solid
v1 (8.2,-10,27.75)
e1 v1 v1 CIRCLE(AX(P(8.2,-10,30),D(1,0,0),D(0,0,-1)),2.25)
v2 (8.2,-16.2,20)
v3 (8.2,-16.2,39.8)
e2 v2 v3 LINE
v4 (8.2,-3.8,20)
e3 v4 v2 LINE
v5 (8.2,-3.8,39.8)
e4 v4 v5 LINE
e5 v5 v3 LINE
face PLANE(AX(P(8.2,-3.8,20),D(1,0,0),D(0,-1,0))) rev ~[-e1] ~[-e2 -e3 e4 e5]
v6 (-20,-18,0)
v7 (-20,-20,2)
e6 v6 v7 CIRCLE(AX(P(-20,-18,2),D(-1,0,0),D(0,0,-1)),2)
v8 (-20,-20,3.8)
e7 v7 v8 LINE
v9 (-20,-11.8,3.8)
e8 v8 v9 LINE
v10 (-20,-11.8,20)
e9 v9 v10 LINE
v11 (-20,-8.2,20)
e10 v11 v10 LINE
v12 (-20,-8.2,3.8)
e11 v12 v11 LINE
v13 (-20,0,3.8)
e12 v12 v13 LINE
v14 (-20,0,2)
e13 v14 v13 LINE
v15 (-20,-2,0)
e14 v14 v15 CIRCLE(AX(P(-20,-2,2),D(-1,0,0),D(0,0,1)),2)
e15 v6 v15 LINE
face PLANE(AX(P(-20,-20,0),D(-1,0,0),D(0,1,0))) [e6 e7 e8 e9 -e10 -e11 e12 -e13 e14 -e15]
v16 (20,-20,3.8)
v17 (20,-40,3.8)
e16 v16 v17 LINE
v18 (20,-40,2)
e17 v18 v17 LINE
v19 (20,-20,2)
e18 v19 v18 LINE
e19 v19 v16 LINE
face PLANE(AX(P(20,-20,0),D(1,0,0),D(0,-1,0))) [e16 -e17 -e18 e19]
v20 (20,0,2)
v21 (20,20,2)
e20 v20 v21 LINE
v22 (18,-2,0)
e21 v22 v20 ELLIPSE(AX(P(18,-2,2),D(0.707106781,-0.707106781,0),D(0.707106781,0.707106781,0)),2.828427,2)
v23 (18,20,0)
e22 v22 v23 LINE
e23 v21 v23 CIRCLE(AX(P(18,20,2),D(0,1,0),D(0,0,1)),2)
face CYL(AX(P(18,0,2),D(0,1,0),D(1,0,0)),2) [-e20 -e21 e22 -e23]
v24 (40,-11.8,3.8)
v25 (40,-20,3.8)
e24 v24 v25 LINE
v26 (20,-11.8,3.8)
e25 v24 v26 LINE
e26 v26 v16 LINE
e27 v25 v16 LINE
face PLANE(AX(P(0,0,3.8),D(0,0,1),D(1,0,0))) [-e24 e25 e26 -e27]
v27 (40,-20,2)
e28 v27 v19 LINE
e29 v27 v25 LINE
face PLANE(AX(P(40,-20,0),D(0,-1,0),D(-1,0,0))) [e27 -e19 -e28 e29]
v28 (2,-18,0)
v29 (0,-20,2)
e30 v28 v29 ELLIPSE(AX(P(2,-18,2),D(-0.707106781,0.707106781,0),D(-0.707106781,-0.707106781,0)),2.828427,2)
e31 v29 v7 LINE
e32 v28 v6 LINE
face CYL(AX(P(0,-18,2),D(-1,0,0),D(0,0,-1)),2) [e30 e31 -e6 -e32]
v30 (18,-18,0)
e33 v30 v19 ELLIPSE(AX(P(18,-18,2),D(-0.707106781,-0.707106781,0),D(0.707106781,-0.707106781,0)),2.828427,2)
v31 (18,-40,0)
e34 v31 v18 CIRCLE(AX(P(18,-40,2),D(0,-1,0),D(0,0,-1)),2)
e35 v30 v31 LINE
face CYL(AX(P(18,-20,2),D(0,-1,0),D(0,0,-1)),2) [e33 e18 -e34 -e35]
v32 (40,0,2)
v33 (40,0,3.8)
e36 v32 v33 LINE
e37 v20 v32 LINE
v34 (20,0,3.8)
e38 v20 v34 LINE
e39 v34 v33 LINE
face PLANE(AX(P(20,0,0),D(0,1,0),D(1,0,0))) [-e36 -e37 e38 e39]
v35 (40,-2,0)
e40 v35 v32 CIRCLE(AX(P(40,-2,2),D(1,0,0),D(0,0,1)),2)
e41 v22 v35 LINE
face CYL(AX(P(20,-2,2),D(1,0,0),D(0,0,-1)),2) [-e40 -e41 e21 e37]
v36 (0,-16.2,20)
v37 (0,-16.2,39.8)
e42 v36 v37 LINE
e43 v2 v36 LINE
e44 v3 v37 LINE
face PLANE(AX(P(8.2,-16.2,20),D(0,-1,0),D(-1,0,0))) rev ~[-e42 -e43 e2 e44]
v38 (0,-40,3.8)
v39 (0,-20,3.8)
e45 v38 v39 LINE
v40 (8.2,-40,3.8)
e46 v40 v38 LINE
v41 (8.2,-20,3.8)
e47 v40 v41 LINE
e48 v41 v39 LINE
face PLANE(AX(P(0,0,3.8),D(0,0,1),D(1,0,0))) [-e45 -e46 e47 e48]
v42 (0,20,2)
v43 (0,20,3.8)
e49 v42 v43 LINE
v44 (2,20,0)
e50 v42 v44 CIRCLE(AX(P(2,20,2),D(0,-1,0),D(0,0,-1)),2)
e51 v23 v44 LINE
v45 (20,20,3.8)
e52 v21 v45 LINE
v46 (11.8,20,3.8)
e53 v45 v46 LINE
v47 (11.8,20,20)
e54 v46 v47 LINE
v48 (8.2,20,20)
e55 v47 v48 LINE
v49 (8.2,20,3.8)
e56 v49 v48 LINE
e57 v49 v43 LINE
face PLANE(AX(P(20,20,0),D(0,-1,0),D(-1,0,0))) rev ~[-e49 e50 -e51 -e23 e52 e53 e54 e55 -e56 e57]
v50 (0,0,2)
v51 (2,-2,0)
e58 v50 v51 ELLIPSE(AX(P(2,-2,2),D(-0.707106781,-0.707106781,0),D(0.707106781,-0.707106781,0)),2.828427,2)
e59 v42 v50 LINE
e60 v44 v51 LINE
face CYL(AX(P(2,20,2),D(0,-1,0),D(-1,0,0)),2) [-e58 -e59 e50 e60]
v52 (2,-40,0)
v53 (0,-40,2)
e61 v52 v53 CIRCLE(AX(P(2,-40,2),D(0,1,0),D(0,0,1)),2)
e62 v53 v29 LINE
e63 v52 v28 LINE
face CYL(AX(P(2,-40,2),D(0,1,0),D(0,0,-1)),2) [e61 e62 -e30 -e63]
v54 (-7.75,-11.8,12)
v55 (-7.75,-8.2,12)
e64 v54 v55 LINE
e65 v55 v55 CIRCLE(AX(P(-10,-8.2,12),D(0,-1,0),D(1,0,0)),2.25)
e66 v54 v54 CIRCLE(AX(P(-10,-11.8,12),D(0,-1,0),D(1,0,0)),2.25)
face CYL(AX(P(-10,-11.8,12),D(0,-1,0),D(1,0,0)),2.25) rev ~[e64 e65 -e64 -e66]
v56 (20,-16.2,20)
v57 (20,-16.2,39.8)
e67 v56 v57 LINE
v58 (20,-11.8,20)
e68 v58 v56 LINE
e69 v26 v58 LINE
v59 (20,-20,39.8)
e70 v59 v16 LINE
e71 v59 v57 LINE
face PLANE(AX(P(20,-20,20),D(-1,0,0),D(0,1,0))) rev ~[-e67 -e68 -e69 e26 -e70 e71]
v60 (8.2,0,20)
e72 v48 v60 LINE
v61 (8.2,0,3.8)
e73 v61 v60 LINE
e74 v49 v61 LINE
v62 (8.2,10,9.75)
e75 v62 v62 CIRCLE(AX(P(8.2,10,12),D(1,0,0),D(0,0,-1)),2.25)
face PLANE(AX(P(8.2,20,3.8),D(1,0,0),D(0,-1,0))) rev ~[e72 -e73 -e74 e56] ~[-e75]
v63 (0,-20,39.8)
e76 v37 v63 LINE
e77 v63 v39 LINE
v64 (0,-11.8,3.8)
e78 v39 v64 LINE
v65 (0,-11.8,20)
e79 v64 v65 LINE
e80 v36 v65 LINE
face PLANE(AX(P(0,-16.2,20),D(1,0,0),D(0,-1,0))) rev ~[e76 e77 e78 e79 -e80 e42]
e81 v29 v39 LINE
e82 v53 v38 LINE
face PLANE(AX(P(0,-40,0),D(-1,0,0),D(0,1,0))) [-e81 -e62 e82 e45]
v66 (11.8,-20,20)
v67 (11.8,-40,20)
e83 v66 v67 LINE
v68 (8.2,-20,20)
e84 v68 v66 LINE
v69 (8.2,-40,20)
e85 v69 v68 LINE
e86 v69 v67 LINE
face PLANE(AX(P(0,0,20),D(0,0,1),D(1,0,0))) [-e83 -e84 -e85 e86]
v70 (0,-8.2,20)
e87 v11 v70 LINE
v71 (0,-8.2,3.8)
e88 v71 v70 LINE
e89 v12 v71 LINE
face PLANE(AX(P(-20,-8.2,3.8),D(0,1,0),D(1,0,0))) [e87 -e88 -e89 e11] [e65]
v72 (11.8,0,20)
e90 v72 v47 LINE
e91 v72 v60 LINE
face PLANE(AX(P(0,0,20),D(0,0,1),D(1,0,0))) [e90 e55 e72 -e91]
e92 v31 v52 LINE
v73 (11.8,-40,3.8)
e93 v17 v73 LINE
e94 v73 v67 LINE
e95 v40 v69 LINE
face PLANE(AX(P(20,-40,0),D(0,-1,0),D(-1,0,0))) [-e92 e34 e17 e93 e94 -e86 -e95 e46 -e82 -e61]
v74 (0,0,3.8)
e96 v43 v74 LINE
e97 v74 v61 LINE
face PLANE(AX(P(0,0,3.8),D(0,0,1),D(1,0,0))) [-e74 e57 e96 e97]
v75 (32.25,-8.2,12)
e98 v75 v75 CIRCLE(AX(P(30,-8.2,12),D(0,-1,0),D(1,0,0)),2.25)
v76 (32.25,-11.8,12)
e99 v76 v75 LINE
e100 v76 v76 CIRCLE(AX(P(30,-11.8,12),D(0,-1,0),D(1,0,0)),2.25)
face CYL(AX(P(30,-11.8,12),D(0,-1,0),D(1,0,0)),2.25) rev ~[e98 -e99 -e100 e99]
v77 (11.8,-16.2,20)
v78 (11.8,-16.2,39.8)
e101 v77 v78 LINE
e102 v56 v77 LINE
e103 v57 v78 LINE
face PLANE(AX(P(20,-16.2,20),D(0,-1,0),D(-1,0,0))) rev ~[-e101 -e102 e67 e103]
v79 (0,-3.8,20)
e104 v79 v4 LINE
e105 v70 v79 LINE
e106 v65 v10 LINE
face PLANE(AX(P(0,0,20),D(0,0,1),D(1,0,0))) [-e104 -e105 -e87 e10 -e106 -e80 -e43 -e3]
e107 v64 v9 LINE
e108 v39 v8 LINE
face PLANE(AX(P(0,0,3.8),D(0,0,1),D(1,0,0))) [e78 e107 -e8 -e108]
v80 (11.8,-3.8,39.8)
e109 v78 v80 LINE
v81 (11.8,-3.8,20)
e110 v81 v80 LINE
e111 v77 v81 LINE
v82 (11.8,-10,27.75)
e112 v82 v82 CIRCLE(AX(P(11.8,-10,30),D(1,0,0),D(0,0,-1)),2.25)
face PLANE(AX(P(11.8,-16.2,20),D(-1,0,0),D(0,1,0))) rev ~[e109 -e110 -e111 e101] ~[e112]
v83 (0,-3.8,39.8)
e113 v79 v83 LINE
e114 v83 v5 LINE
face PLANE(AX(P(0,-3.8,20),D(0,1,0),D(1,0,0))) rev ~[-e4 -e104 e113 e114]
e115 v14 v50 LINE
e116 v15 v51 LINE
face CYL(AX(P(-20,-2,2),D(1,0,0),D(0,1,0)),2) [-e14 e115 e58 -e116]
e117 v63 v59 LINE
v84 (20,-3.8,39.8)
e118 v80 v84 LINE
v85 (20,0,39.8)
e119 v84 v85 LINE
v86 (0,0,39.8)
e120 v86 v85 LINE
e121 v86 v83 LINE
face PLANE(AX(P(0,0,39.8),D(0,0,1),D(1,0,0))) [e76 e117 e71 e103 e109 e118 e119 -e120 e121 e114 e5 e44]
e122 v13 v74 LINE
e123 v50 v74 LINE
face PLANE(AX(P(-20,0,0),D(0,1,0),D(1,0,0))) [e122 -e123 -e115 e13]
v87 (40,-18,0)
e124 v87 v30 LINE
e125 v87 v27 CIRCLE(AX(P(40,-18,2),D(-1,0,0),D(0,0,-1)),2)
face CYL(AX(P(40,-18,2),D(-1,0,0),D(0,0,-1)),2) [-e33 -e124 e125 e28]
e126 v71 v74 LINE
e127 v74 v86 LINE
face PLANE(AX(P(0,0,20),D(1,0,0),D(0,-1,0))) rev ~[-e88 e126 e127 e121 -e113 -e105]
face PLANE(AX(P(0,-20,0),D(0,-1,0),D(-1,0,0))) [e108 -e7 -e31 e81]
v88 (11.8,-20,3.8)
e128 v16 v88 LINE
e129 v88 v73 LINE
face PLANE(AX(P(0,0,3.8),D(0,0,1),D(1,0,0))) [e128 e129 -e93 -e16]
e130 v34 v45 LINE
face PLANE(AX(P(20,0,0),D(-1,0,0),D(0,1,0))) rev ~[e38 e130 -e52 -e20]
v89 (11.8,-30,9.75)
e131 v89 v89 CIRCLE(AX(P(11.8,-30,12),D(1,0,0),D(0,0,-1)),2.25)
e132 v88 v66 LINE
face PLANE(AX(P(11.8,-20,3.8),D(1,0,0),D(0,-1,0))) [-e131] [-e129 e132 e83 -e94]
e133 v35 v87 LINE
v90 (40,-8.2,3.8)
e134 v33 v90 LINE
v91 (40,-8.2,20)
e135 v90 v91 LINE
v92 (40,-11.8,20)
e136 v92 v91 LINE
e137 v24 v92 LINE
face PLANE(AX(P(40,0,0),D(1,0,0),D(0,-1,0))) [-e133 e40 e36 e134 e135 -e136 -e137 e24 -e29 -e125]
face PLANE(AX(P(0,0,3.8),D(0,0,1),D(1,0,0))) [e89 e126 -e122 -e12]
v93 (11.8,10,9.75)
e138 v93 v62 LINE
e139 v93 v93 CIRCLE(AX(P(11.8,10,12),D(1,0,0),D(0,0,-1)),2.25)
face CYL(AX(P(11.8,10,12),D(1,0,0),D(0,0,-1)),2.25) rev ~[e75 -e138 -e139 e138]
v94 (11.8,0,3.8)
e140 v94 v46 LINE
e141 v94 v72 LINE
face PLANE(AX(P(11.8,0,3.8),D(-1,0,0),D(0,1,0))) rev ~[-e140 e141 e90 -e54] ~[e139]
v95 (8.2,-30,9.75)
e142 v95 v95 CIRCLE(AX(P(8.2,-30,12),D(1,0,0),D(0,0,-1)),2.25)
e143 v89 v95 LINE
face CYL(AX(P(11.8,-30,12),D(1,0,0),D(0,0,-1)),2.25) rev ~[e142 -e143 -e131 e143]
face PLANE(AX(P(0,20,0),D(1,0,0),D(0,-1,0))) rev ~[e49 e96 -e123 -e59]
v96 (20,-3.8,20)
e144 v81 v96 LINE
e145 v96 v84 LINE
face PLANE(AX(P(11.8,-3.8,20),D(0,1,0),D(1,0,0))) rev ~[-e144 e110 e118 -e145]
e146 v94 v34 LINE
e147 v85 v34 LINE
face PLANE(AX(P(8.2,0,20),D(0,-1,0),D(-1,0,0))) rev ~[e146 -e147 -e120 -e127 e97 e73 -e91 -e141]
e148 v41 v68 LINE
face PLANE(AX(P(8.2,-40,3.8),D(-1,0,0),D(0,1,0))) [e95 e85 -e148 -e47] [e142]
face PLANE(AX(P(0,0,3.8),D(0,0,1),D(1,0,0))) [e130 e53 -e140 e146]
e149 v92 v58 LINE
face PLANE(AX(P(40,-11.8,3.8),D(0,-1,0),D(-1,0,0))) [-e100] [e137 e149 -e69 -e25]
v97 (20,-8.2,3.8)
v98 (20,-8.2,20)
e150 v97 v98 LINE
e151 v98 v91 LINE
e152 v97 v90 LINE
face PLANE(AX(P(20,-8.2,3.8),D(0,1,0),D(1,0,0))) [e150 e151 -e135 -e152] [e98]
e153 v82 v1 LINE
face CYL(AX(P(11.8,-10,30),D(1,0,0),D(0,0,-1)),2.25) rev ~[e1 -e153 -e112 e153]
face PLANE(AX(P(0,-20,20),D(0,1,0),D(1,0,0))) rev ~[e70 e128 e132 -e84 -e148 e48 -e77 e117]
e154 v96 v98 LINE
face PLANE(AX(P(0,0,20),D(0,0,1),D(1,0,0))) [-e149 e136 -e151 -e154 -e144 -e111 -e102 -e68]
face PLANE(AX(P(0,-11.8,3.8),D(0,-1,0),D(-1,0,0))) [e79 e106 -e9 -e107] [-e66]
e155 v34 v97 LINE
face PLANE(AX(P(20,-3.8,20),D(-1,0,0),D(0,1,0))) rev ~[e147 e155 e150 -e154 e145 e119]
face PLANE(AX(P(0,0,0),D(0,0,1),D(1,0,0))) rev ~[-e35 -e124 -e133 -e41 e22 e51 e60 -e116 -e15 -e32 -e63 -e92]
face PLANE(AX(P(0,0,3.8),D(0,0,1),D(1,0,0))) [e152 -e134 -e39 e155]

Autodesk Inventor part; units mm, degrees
ref_plane "YZ Plane" through (0, 0, 0) normal (1, 0, 0) x (0, 1, 0)
ref_plane "XZ Plane" through (0, 0, 0) normal (0, 1, 0) x (-1, 0, 0)
ref_plane "XY Plane" through (0, 0, 0) normal (0, 0, 1) x (1, 0, 0)
sketch "Sketch1" plane through (0, 0, 0) normal (0, 0, 1) x (1, 0, 0)
  line L0 (0, 0) -> (20, 0)
  line L1 (20, 0) -> (20, 20)
  line L2 (20, 20) -> (0, 20)
  line L3 (0, 20) -> (0, 0)
  line L4 (0, 0) -> (20, 0)
  line L5 (20, 0) -> (20, -20)
  line L6 (20, -20) -> (0, -20)
  line L7 (0, -20) -> (0, 0)
  line L8 (20, 0) -> (40, 0)
  line L9 (40, 0) -> (40, -20)
  line L10 (40, -20) -> (20, -20)
  line L11 (20, -20) -> (20, 0)
  line L12 (0, -20) -> (-20, -20)
  line L13 (-20, -20) -> (-20, 0)
  line L14 (-20, 0) -> (0, 0)
  line L15 (0, 0) -> (0, -20)
  line L16 (0, -20) -> (20, -20)
  line L17 (20, -20) -> (20, -40)
  line L18 (20, -40) -> (0, -40)
  line L19 (0, -40) -> (0, -20)
  dimension "d0" = 20
  dimension "d1" = 20
  dimension "d2" = 20
  dimension "d3" = 20
  dimension "d4" = 20
  dimension "d5" = 20
  dimension "d6" = 20
  dimension "d7" = 20
  dimension "d8" = 20
  dimension "d9" = 20
extrude "Extrusion1" add sketch "Sketch1" along normal blind 3.8
sketch "Sketch2" plane through (0, 0, 3.8) normal (0, 0, 1) x (1, 0, 0)
  line L0 (-20, 0) -> (-20, -20) projected
  line L1 (-20, -8.2) -> (0, -8.2)
  line L2 (0, -8.2) -> (0, -11.8)
  line L3 (0, -11.8) -> (-20, -11.8)
  line L4 (-20, -11.8) -> (-20, -8.2)
  line L5 (-20, -20) -> (0, -20) projected
  line L6 (0, 0) -> (20, 0)
  line L7 (20, 0) -> (20, -20)
  line L8 (20, -20) -> (0, -20)
  line L9 (0, -20) -> (0, 0)
  line L10 (40, -20) -> (40, 0) projected
  line L11 (20, -8.2) -> (40, -8.2)
  line L12 (40, -8.2) -> (40, -11.8)
  line L13 (40, -11.8) -> (20, -11.8)
  line L14 (20, -11.8) -> (20, -8.2)
  line L15 (20, 20) -> (0, 20) projected
  line L16 (8.2, 0) -> (11.8, 0)
  line L17 (11.8, 0) -> (11.8, 20)
  line L18 (11.8, 20) -> (8.2, 20)
  line L19 (8.2, 20) -> (8.2, 0)
  line L20 (0, -40) -> (20, -40) projected
  line L21 (8.2, -20) -> (11.8, -20)
  line L22 (11.8, -20) -> (11.8, -40)
  line L23 (11.8, -40) -> (8.2, -40)
  line L24 (8.2, -40) -> (8.2, -20)
  dimension "d12" = 8.2
  dimension "d13" = 8.2
  dimension "d14" = 20
  dimension "d15" = 8.2
  dimension "d16" = 8.2
  dimension "d17" = 8.2
  dimension "d18" = 8.2
  dimension "d19" = 8.2
  dimension "d20" = 8.2
extrude "Extrusion2" add sketch "Sketch2" along normal blind 16.2 contours L1 L2 L3 L0 | L9 L6 L7 L8 L2 | L19 L15 L17 L6 | L8 L22 L20 L24 | L11 L10 L13 L7
sketch "Sketch3" plane through (0, 0, 20) normal (0, 0, 1) x (1, 0, 0)
  line L0 (0, 0) -> (0, -8.2) projected
  line L1 (0, 0) -> (0, -3.8)
  line L2 (0, -3.8) -> (8.2, -3.8)
  line L3 (8.2, -3.8) -> (8.2, -16.2)
  line L4 (8.2, -16.2) -> (0, -16.2)
  line L5 (0, -11.8) -> (0, -20) projected
  line L6 (0, -16.2) -> (0, -20)
  line L7 (20, -40) -> (20, -20) projected
  line L8 (0, -20) -> (20, -20)
  line L9 (20, -20) -> (20, -16.2)
  line L10 (20, -20) -> (20, -11.8) projected
  line L11 (20, -16.2) -> (11.8, -16.2)
  line L12 (11.8, -16.2) -> (11.8, -3.8)
  line L13 (11.8, -3.8) -> (20, -3.8)
  line L14 (20, -8.2) -> (20, 0) projected
  line L15 (8.2, 0) -> (0, 0) projected
  line L16 (20, 0) -> (0, 0)
  line L17 (40, 0) -> (20, 0) projected
  line L18 (20, 0) -> (20, -3.8)
  dimension "d23" = 3.8
  dimension "d24" = 8.2
  dimension "d25" = 12.4
  dimension "d26" = 8.2
extrude "Extrusion3" add sketch "Sketch3" along normal blind 19.8
sketch "Sketch4" plane through (11.8, 0, 3.8) normal (1, 0, 0) x (0, 0, -1)
  circle A0 centre (-8.2, 10) radius 2.25
  line L0 (-16.2, 0) -> (-16.2, 20) projected
  line L1 (0, 20) -> (-16.2, 20) projected
  point P0 (3.8, 0)
  dimension "d29" = 4.5
  dimension "d30" = 8
  dimension "d31" = 10
extrude "Extrusion4" cut sketch "Sketch4" against normal through all
sketch "Sketch5" plane through (11.8, -40, 3.8) normal (1, 0, 0) x (0, 0, -1)
  circle A0 centre (-8.2, 10) radius 2.25
  line L0 (-16.2, 0) -> (-16.2, 20) projected
  line L1 (0, 0) -> (-16.2, 0) projected
  point P0 (3.8, 40)
  dimension "d34" = 4.5
  dimension "d35" = 8
  dimension "d36" = 10
extrude "Extrusion5" cut sketch "Sketch5" against normal through all
sketch "Sketch6" plane through (11.8, -16.2, 20) normal (1, 0, 0) x (0, 0, -1)
  circle A0 centre (-10, 6.2) radius 2.25
  line L0 (0, 4.4) -> (0, 8) projected
  line L1 (16.2, 16.2) -> (-19.8, 16.2) projected
  point P0 (20, 16.2)
  dimension "d39" = 4.5
  dimension "d40" = 10
  dimension "d41" = 10
extrude "Extrusion6" cut sketch "Sketch6" against normal through all
sketch "Sketch7" plane through (20, -11.8, 3.8) normal (0, -1, 0) x (1, 0, 0)
  circle A0 centre (10, 8.2) radius 2.25
  line L0 (0, 16.2) -> (20, 16.2) projected
  line L1 (20, 0) -> (20, 16.2) projected
  point P0 (-20, -3.8)
  dimension "d44" = 4.5
  dimension "d45" = 8
  dimension "d46" = 10
extrude "Extrusion7" cut sketch "Sketch7" against normal through all
sketch "Sketch8" plane through (-20, -11.8, 3.8) normal (0, -1, 0) x (1, 0, 0)
  circle A0 centre (10, 8.2) radius 2.25
  line L0 (0, 16.2) -> (20, 16.2) projected
  line L1 (0, 0) -> (0, 16.2) projected
  point P0 (20, -3.8)
  dimension "d49" = 4.5
  dimension "d50" = 8
  dimension "d51" = 10
extrude "Extrusion8" cut sketch "Sketch8" against normal through all
fillet "Fillet1" radius 2 8 edges at (-10, 0, 0) (0, 10, 0) (-10, -20, 0) (0, -30, 0) (20, -30, 0) (30, -20, 0) (30, 0, 0) (20, 10, 0)
equation "\"d13\" = d12"
equation "\"d15\" = d12"
equation "\"d16\" = d12"
equation "\"d17\" = d12"
equation "\"d18\" = d12"
equation "\"d19\" = d12"
equation "\"d20\" = d12"
equation "\"d26\" = d24"
properties part number "fourwaylockver1"
